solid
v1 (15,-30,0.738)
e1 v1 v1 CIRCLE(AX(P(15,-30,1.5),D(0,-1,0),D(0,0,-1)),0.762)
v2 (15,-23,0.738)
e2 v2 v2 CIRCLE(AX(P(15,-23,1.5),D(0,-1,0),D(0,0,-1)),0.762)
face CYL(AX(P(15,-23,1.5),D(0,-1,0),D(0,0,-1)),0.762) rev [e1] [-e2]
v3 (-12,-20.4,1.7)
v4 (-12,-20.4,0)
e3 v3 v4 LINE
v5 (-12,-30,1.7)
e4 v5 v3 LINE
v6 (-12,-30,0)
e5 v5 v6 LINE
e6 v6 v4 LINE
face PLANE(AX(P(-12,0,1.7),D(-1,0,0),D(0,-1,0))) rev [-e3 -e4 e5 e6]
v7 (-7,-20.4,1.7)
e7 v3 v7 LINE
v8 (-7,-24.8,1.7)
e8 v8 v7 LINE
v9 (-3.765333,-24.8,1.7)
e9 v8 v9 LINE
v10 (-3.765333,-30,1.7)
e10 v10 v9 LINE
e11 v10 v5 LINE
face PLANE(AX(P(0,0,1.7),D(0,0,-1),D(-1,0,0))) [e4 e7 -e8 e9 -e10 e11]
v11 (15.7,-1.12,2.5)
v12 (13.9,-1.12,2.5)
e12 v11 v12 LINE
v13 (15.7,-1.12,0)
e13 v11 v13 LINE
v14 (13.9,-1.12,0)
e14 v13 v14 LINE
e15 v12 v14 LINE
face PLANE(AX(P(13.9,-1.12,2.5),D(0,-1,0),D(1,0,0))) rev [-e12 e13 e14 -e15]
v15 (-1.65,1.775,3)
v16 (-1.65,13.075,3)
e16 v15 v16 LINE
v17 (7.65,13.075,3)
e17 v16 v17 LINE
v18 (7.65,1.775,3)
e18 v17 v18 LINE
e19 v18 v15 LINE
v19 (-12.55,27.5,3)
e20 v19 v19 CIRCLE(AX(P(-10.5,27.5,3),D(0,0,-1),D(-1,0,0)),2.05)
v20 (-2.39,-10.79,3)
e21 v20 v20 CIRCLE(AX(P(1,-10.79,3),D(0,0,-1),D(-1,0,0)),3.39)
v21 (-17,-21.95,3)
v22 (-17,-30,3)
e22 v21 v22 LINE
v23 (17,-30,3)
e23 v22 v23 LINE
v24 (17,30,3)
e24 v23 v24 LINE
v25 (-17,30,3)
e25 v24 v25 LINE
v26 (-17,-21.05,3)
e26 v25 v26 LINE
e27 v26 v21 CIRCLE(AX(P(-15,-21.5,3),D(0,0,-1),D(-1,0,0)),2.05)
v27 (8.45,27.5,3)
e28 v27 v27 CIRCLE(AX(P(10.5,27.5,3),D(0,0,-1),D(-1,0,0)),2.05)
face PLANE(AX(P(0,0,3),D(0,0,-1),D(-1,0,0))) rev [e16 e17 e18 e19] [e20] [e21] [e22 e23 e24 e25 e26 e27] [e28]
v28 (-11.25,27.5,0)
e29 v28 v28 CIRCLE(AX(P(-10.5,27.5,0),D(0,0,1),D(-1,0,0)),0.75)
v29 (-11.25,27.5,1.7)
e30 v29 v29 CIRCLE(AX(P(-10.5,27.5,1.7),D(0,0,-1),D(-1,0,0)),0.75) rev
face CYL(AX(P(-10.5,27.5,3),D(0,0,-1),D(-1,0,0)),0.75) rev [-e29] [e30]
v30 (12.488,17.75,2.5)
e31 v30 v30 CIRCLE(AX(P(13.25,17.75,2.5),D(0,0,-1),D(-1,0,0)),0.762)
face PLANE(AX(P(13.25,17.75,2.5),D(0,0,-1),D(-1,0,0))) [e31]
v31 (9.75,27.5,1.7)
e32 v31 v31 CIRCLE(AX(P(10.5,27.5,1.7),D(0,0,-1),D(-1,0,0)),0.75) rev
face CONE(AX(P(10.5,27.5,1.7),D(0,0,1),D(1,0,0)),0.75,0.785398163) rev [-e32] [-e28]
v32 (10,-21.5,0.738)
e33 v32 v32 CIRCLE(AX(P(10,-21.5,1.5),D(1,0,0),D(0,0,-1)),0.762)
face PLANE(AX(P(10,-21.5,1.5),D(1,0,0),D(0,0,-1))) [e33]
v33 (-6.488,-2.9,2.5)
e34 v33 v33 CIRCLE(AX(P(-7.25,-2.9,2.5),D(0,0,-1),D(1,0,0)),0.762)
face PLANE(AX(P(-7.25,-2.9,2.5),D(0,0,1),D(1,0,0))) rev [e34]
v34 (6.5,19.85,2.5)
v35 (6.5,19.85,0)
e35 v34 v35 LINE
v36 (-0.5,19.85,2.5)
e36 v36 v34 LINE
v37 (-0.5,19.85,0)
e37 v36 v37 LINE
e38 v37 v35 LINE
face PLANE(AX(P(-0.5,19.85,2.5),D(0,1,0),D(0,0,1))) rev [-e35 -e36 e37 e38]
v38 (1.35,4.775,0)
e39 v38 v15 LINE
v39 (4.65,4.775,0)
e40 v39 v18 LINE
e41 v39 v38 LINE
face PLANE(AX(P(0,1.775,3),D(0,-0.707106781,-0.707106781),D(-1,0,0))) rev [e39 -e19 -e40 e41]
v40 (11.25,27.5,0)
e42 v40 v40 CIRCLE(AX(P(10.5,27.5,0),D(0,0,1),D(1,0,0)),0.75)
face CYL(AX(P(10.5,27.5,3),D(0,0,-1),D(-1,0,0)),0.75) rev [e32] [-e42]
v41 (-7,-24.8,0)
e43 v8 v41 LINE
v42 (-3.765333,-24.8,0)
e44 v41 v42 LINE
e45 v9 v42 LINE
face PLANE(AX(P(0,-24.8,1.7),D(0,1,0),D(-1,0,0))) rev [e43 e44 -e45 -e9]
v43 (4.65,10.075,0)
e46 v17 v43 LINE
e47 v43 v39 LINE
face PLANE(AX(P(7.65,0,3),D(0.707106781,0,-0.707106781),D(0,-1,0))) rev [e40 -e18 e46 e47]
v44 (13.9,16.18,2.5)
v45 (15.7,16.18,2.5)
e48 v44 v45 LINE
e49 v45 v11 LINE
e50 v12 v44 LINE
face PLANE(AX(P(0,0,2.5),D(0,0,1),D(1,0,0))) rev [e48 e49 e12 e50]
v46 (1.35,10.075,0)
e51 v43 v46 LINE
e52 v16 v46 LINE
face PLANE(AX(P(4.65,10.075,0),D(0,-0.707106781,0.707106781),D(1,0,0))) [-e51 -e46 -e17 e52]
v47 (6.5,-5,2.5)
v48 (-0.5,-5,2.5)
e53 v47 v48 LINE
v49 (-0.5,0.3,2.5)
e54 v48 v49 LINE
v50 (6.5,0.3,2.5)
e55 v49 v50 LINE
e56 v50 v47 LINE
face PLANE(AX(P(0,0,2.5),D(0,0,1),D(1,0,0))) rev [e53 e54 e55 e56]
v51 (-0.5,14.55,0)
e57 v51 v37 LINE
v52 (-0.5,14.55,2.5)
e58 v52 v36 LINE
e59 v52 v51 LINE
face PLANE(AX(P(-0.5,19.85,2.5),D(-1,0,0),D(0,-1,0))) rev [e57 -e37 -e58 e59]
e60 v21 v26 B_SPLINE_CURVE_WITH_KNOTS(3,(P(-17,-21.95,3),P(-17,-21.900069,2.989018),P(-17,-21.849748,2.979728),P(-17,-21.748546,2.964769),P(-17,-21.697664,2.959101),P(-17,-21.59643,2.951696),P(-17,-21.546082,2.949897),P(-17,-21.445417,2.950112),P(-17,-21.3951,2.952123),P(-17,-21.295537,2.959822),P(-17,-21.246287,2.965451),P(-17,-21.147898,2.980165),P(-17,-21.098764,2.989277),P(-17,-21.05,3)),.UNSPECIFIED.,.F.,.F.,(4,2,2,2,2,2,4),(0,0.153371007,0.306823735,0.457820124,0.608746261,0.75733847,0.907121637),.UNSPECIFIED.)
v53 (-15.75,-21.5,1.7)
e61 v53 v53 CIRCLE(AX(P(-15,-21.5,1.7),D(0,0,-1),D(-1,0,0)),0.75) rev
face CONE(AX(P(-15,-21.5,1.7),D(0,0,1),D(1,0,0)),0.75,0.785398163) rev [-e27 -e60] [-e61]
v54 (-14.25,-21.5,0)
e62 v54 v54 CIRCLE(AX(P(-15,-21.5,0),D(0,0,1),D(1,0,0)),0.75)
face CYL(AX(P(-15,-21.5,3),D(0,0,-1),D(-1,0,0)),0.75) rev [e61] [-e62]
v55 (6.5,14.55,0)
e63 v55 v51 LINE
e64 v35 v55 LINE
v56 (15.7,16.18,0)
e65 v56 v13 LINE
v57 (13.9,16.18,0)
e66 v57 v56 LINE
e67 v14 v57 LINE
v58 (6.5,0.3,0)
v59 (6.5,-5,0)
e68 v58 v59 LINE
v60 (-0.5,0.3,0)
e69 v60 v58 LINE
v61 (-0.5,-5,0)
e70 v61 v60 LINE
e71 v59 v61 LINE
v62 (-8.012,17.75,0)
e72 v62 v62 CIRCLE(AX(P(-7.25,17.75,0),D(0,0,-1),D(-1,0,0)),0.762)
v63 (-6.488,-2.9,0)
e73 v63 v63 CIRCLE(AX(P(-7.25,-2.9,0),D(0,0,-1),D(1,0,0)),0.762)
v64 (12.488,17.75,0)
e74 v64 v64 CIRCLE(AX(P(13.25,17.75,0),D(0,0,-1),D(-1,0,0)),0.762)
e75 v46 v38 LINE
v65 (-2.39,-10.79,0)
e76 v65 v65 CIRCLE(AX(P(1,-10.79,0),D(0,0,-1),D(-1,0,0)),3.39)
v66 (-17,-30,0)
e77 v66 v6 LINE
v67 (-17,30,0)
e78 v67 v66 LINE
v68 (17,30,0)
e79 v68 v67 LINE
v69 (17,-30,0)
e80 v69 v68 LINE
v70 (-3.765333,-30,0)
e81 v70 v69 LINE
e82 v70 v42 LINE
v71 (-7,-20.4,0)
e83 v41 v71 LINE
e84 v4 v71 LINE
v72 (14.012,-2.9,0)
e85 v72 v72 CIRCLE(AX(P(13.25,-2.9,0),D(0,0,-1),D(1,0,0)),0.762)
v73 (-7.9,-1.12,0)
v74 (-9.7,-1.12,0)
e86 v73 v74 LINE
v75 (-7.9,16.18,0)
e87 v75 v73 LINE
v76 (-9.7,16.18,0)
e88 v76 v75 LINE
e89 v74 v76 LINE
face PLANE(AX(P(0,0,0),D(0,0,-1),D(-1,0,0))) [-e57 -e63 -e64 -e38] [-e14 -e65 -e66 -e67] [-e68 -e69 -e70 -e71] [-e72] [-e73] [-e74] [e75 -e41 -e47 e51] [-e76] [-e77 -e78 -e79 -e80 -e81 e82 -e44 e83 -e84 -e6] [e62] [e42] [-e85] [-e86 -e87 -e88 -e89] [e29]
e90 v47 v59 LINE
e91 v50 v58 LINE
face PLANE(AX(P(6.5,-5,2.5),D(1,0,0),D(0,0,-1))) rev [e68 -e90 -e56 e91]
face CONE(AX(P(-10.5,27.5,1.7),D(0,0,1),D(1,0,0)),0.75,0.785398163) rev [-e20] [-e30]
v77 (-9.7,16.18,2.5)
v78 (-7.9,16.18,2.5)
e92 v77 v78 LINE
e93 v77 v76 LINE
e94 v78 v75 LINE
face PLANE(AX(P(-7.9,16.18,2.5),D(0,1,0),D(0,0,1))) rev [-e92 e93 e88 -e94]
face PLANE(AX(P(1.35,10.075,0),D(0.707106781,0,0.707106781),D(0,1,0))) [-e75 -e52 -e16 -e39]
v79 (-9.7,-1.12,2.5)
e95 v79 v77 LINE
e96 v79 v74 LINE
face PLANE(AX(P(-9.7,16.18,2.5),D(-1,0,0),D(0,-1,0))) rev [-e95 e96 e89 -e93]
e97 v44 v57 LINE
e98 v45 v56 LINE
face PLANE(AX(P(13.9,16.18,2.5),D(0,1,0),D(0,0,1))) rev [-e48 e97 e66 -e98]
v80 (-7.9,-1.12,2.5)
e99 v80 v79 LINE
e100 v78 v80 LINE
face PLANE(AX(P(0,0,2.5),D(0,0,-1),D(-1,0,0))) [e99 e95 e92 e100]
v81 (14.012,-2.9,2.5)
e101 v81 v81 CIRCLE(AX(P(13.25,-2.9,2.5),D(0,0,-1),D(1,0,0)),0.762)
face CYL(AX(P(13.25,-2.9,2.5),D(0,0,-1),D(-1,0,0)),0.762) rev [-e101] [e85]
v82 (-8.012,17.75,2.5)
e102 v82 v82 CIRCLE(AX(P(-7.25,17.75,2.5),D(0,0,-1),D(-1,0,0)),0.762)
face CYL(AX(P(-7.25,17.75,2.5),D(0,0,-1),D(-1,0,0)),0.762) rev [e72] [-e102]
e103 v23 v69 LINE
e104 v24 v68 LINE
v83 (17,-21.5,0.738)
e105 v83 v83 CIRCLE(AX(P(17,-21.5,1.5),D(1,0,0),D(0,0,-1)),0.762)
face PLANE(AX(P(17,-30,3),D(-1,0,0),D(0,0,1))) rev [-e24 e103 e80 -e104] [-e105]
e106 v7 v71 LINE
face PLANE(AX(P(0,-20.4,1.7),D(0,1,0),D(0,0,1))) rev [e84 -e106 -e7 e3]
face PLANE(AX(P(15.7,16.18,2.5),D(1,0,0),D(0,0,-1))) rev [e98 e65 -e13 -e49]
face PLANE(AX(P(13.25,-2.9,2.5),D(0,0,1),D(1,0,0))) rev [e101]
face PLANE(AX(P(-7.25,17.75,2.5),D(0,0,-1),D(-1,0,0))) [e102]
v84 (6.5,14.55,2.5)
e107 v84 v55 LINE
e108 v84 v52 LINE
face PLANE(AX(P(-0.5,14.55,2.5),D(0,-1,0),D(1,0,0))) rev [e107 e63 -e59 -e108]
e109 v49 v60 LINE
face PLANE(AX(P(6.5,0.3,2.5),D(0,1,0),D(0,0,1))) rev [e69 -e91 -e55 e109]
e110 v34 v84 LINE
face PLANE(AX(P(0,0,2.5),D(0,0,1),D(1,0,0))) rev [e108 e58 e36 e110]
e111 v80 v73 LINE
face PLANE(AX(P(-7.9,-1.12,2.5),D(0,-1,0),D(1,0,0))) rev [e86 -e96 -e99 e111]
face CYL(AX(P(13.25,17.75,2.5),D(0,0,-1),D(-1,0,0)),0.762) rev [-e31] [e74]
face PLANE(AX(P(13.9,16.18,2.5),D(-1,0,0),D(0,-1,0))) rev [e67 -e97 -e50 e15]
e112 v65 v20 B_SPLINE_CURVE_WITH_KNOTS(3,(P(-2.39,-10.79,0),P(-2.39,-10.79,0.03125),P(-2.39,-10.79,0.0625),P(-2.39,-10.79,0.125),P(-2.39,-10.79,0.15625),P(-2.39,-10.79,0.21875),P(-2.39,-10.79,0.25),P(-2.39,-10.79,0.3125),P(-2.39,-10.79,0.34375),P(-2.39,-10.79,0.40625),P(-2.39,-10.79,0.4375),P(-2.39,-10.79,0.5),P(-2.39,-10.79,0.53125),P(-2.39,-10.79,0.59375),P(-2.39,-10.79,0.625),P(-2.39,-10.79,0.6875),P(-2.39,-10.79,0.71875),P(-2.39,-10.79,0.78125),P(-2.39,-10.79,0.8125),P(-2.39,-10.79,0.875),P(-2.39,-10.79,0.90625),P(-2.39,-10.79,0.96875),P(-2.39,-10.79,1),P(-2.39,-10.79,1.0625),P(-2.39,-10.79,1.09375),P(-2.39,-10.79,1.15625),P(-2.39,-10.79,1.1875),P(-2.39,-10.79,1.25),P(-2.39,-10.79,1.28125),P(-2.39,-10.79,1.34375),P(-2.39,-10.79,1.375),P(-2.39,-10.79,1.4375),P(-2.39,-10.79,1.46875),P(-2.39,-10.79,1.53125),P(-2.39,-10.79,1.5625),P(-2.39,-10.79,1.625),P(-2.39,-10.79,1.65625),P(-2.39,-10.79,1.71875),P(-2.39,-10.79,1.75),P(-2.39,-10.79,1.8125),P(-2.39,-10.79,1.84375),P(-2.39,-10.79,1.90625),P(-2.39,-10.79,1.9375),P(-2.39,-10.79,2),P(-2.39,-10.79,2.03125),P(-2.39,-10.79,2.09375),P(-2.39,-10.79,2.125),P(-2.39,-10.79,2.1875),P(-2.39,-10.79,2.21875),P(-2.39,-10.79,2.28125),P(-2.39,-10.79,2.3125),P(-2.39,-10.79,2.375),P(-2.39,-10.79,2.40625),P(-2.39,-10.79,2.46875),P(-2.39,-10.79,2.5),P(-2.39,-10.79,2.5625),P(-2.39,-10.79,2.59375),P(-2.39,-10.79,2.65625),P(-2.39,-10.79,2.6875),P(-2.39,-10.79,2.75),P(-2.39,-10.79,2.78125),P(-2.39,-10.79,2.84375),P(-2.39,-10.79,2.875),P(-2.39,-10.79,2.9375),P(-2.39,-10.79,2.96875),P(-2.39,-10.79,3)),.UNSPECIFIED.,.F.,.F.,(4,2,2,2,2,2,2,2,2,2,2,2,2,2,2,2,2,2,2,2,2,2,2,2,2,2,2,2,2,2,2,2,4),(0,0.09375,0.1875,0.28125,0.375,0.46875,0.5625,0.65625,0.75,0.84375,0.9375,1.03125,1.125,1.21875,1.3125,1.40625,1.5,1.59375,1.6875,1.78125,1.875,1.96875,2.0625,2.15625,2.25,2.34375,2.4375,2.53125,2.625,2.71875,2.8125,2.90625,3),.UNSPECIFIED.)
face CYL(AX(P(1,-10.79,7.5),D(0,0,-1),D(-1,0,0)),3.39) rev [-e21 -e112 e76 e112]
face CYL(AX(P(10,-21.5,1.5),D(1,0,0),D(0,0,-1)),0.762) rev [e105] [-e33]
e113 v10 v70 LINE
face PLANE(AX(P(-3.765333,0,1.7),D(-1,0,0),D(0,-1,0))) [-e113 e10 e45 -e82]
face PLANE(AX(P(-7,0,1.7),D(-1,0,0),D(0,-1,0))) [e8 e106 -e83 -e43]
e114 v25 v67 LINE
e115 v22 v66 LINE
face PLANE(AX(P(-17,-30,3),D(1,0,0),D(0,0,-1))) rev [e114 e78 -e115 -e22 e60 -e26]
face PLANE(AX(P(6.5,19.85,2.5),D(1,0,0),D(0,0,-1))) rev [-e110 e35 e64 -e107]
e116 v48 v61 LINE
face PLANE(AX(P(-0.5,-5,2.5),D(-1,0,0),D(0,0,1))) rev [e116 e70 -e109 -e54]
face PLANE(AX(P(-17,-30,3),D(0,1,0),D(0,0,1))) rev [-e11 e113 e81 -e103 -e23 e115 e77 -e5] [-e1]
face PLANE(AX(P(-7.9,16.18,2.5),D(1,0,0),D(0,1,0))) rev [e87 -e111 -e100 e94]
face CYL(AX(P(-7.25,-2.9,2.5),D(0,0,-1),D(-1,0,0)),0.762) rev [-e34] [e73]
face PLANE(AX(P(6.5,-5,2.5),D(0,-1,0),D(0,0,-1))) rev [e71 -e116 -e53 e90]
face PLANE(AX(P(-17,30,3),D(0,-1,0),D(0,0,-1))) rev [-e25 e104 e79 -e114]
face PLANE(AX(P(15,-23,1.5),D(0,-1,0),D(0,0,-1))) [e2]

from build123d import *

# Parameters (mm, degrees)
SKETCH1_W           = 34
SKETCH1_H           = 60
SKETCH1_R           = 0.75
BOSS_EXTRUDE1_DEPTH = 3
CHAMFER1_SIZE       = 1.3
SKETCH2_R           = 0.762
CUT_EXTRUDE1_DEPTH  = 7
SKETCH3_W           = 5
SKETCH3_H           = 4.4
CUT_EXTRUDE2_DEPTH  = 1.7
SKETCH4_R           = 0.762
CUT_EXTRUDE3_DEPTH  = 7
SKETCH5_W           = 3.3
SKETCH5_H           = 5.3
CUT_EXTRUDE4_DEPTH  = 3.5
SKETCH7_R           = 0.762
SKETCH7_W           = 7
SKETCH7_H           = 5.3
CUT_EXTRUDE5_DEPTH  = 2.5
SKETCH8_W           = 1.8
SKETCH8_H           = 17.3
CUT_EXTRUDE6_DEPTH  = 2.5
SKETCH9_R           = 3.39
CUT_EXTRUDE7_DEPTH  = 7.5
CHAMFER2_SIZE       = 3


# Some blends are built 0.0001 mm under size
with BuildPart() as part:
    # Sketch1 → Boss-Extrude1 (new body)
    with BuildSketch(Plane.XY):
        Rectangle(SKETCH1_W, SKETCH1_H)
        with Locations((-15, -21.5)):
            Circle(SKETCH1_R, mode=Mode.SUBTRACT)
        with Locations(Location((-10.5, 27.5, 0), (0, 0, 180))):
            Circle(SKETCH1_R, mode=Mode.SUBTRACT)
        with Locations((10.5, 27.5)):
            Circle(SKETCH1_R, mode=Mode.SUBTRACT)
    extrude(amount=BOSS_EXTRUDE1_DEPTH)

    # Chamfer1
    # the kernel refuses this chamfer: 1.3 mm, written as the material it takes off along each edge
    with BuildSketch(Plane(origin=(-15, -21.5, 3), x_dir=(1, 0, 0), z_dir=(0, -1, 0))) as chamfer1_piece_1:
        Polygon((0.75, -CHAMFER1_SIZE), (0.75 + CHAMFER1_SIZE, 0), (0.75, 0), align=None)
    revolve(axis=Axis((-15, -21.5, 3), (0, 0, 1)), mode=Mode.SUBTRACT)
    with BuildSketch(Plane(origin=(-10.5, 27.5, 3), x_dir=(-1, 0, 0), z_dir=(0, 1, 0))) as chamfer1_piece_2:
        Polygon((0.75, -CHAMFER1_SIZE), (0.75 + CHAMFER1_SIZE, 0), (0.75, 0), align=None)
    revolve(axis=Axis((-10.5, 27.5, 3), (0, 0, 1)), mode=Mode.SUBTRACT)
    with BuildSketch(Plane(origin=(10.5, 27.5, 3), x_dir=(1, 0, 0), z_dir=(0, -1, 0))) as chamfer1_piece_3:
        Polygon((0.75, -CHAMFER1_SIZE), (0.75 + CHAMFER1_SIZE, 0), (0.75, 0), align=None)
    revolve(axis=Axis((10.5, 27.5, 3), (0, 0, 1)), mode=Mode.SUBTRACT)

    # Sketch2 → Cut-Extrude1 (cut)
    with BuildSketch(Plane(origin=(17, 0, 0), x_dir=(0, 0, -1), z_dir=(1, 0, 0))):
        with Locations((-1.5, -21.5)):
            Circle(SKETCH2_R)
    extrude(amount=-CUT_EXTRUDE1_DEPTH, mode=Mode.SUBTRACT)

    # Sketch3 → Cut-Extrude2 (cut)
    with BuildSketch(Plane(origin=(0, 0, 0), x_dir=(-1, 0, 0), z_dir=(0, 0, -1))):
        Polygon((3.765333438, -30), (12, -30), (12, -24.8), (7, -24.8), (3.765333438, -24.8), align=None)
        with Locations((9.5, -22.6)):
            Rectangle(SKETCH3_W, SKETCH3_H)
    extrude(amount=-CUT_EXTRUDE2_DEPTH, mode=Mode.SUBTRACT)

    # Sketch4 → Cut-Extrude3 (cut)
    with BuildSketch(Plane.XZ.offset(30)):
        with Locations(Location((15, 1.5, 0), (0, 0, 270))):
            Circle(SKETCH4_R)
    extrude(amount=-CUT_EXTRUDE3_DEPTH, mode=Mode.SUBTRACT)

    # Sketch5 → Cut-Extrude4 (cut)
    with BuildSketch(Plane(origin=(0, 0, 0), x_dir=(-1, 0, 0), z_dir=(0, 0, -1))):
        with Locations((-3, 7.425)):
            Rectangle(SKETCH5_W, SKETCH5_H)
    extrude(amount=-CUT_EXTRUDE4_DEPTH, mode=Mode.SUBTRACT)

    # Sketch7 → Cut-Extrude5 (cut)
    with BuildSketch(Plane(origin=(0, 0, 0), x_dir=(-1, 0, 0), z_dir=(0, 0, -1))):
        with Locations((-13.25, 17.75)):
            Circle(SKETCH7_R)
        with Locations((7.25, 17.75)):
            Circle(SKETCH7_R)
        with Locations(Location((7.25, -2.9, 0), (0, 0, 180))):
            Circle(SKETCH7_R)
        with Locations(Location((-13.25, -2.9, 0), (0, 0, 180))):
            Circle(SKETCH7_R)
        with Locations((-3, 17.2)):
            Rectangle(SKETCH7_W, SKETCH7_H)
        with Locations((-3, -2.35)):
            Rectangle(SKETCH7_W, SKETCH7_H)
    extrude(amount=-CUT_EXTRUDE5_DEPTH, mode=Mode.SUBTRACT)

    # Sketch8 → Cut-Extrude6 (cut)
    with BuildSketch(Plane(origin=(0, 0, 0), x_dir=(-1, 0, 0), z_dir=(0, 0, -1))):
        with Locations((8.8, 7.53)):
            Rectangle(SKETCH8_W, SKETCH8_H)
        with Locations((-14.8, 7.53)):
            Rectangle(SKETCH8_W, SKETCH8_H)
    extrude(amount=-CUT_EXTRUDE6_DEPTH, mode=Mode.SUBTRACT)

    # Sketch9 → Cut-Extrude7 (cut)
    with BuildSketch(Plane(origin=(0, 0, 0), x_dir=(-1, 0, 0), z_dir=(0, 0, -1))):
        with Locations((-1, -10.79)):
            Circle(SKETCH9_R)
    extrude(amount=-CUT_EXTRUDE7_DEPTH, mode=Mode.SUBTRACT)

    # Chamfer2
    chamfer2_edges = [part.edges().sort_by_distance(p)[0] for p in [
        (4.65, 7.425, 3),
        (3, 4.775, 3),
        (1.35, 7.425, 3),
        (3, 10.075, 3),
    ]]
    chamfer(chamfer2_edges, length=CHAMFER2_SIZE - 0.0001)  # a hair under: the kernel refuses the full size


solid = part.part
